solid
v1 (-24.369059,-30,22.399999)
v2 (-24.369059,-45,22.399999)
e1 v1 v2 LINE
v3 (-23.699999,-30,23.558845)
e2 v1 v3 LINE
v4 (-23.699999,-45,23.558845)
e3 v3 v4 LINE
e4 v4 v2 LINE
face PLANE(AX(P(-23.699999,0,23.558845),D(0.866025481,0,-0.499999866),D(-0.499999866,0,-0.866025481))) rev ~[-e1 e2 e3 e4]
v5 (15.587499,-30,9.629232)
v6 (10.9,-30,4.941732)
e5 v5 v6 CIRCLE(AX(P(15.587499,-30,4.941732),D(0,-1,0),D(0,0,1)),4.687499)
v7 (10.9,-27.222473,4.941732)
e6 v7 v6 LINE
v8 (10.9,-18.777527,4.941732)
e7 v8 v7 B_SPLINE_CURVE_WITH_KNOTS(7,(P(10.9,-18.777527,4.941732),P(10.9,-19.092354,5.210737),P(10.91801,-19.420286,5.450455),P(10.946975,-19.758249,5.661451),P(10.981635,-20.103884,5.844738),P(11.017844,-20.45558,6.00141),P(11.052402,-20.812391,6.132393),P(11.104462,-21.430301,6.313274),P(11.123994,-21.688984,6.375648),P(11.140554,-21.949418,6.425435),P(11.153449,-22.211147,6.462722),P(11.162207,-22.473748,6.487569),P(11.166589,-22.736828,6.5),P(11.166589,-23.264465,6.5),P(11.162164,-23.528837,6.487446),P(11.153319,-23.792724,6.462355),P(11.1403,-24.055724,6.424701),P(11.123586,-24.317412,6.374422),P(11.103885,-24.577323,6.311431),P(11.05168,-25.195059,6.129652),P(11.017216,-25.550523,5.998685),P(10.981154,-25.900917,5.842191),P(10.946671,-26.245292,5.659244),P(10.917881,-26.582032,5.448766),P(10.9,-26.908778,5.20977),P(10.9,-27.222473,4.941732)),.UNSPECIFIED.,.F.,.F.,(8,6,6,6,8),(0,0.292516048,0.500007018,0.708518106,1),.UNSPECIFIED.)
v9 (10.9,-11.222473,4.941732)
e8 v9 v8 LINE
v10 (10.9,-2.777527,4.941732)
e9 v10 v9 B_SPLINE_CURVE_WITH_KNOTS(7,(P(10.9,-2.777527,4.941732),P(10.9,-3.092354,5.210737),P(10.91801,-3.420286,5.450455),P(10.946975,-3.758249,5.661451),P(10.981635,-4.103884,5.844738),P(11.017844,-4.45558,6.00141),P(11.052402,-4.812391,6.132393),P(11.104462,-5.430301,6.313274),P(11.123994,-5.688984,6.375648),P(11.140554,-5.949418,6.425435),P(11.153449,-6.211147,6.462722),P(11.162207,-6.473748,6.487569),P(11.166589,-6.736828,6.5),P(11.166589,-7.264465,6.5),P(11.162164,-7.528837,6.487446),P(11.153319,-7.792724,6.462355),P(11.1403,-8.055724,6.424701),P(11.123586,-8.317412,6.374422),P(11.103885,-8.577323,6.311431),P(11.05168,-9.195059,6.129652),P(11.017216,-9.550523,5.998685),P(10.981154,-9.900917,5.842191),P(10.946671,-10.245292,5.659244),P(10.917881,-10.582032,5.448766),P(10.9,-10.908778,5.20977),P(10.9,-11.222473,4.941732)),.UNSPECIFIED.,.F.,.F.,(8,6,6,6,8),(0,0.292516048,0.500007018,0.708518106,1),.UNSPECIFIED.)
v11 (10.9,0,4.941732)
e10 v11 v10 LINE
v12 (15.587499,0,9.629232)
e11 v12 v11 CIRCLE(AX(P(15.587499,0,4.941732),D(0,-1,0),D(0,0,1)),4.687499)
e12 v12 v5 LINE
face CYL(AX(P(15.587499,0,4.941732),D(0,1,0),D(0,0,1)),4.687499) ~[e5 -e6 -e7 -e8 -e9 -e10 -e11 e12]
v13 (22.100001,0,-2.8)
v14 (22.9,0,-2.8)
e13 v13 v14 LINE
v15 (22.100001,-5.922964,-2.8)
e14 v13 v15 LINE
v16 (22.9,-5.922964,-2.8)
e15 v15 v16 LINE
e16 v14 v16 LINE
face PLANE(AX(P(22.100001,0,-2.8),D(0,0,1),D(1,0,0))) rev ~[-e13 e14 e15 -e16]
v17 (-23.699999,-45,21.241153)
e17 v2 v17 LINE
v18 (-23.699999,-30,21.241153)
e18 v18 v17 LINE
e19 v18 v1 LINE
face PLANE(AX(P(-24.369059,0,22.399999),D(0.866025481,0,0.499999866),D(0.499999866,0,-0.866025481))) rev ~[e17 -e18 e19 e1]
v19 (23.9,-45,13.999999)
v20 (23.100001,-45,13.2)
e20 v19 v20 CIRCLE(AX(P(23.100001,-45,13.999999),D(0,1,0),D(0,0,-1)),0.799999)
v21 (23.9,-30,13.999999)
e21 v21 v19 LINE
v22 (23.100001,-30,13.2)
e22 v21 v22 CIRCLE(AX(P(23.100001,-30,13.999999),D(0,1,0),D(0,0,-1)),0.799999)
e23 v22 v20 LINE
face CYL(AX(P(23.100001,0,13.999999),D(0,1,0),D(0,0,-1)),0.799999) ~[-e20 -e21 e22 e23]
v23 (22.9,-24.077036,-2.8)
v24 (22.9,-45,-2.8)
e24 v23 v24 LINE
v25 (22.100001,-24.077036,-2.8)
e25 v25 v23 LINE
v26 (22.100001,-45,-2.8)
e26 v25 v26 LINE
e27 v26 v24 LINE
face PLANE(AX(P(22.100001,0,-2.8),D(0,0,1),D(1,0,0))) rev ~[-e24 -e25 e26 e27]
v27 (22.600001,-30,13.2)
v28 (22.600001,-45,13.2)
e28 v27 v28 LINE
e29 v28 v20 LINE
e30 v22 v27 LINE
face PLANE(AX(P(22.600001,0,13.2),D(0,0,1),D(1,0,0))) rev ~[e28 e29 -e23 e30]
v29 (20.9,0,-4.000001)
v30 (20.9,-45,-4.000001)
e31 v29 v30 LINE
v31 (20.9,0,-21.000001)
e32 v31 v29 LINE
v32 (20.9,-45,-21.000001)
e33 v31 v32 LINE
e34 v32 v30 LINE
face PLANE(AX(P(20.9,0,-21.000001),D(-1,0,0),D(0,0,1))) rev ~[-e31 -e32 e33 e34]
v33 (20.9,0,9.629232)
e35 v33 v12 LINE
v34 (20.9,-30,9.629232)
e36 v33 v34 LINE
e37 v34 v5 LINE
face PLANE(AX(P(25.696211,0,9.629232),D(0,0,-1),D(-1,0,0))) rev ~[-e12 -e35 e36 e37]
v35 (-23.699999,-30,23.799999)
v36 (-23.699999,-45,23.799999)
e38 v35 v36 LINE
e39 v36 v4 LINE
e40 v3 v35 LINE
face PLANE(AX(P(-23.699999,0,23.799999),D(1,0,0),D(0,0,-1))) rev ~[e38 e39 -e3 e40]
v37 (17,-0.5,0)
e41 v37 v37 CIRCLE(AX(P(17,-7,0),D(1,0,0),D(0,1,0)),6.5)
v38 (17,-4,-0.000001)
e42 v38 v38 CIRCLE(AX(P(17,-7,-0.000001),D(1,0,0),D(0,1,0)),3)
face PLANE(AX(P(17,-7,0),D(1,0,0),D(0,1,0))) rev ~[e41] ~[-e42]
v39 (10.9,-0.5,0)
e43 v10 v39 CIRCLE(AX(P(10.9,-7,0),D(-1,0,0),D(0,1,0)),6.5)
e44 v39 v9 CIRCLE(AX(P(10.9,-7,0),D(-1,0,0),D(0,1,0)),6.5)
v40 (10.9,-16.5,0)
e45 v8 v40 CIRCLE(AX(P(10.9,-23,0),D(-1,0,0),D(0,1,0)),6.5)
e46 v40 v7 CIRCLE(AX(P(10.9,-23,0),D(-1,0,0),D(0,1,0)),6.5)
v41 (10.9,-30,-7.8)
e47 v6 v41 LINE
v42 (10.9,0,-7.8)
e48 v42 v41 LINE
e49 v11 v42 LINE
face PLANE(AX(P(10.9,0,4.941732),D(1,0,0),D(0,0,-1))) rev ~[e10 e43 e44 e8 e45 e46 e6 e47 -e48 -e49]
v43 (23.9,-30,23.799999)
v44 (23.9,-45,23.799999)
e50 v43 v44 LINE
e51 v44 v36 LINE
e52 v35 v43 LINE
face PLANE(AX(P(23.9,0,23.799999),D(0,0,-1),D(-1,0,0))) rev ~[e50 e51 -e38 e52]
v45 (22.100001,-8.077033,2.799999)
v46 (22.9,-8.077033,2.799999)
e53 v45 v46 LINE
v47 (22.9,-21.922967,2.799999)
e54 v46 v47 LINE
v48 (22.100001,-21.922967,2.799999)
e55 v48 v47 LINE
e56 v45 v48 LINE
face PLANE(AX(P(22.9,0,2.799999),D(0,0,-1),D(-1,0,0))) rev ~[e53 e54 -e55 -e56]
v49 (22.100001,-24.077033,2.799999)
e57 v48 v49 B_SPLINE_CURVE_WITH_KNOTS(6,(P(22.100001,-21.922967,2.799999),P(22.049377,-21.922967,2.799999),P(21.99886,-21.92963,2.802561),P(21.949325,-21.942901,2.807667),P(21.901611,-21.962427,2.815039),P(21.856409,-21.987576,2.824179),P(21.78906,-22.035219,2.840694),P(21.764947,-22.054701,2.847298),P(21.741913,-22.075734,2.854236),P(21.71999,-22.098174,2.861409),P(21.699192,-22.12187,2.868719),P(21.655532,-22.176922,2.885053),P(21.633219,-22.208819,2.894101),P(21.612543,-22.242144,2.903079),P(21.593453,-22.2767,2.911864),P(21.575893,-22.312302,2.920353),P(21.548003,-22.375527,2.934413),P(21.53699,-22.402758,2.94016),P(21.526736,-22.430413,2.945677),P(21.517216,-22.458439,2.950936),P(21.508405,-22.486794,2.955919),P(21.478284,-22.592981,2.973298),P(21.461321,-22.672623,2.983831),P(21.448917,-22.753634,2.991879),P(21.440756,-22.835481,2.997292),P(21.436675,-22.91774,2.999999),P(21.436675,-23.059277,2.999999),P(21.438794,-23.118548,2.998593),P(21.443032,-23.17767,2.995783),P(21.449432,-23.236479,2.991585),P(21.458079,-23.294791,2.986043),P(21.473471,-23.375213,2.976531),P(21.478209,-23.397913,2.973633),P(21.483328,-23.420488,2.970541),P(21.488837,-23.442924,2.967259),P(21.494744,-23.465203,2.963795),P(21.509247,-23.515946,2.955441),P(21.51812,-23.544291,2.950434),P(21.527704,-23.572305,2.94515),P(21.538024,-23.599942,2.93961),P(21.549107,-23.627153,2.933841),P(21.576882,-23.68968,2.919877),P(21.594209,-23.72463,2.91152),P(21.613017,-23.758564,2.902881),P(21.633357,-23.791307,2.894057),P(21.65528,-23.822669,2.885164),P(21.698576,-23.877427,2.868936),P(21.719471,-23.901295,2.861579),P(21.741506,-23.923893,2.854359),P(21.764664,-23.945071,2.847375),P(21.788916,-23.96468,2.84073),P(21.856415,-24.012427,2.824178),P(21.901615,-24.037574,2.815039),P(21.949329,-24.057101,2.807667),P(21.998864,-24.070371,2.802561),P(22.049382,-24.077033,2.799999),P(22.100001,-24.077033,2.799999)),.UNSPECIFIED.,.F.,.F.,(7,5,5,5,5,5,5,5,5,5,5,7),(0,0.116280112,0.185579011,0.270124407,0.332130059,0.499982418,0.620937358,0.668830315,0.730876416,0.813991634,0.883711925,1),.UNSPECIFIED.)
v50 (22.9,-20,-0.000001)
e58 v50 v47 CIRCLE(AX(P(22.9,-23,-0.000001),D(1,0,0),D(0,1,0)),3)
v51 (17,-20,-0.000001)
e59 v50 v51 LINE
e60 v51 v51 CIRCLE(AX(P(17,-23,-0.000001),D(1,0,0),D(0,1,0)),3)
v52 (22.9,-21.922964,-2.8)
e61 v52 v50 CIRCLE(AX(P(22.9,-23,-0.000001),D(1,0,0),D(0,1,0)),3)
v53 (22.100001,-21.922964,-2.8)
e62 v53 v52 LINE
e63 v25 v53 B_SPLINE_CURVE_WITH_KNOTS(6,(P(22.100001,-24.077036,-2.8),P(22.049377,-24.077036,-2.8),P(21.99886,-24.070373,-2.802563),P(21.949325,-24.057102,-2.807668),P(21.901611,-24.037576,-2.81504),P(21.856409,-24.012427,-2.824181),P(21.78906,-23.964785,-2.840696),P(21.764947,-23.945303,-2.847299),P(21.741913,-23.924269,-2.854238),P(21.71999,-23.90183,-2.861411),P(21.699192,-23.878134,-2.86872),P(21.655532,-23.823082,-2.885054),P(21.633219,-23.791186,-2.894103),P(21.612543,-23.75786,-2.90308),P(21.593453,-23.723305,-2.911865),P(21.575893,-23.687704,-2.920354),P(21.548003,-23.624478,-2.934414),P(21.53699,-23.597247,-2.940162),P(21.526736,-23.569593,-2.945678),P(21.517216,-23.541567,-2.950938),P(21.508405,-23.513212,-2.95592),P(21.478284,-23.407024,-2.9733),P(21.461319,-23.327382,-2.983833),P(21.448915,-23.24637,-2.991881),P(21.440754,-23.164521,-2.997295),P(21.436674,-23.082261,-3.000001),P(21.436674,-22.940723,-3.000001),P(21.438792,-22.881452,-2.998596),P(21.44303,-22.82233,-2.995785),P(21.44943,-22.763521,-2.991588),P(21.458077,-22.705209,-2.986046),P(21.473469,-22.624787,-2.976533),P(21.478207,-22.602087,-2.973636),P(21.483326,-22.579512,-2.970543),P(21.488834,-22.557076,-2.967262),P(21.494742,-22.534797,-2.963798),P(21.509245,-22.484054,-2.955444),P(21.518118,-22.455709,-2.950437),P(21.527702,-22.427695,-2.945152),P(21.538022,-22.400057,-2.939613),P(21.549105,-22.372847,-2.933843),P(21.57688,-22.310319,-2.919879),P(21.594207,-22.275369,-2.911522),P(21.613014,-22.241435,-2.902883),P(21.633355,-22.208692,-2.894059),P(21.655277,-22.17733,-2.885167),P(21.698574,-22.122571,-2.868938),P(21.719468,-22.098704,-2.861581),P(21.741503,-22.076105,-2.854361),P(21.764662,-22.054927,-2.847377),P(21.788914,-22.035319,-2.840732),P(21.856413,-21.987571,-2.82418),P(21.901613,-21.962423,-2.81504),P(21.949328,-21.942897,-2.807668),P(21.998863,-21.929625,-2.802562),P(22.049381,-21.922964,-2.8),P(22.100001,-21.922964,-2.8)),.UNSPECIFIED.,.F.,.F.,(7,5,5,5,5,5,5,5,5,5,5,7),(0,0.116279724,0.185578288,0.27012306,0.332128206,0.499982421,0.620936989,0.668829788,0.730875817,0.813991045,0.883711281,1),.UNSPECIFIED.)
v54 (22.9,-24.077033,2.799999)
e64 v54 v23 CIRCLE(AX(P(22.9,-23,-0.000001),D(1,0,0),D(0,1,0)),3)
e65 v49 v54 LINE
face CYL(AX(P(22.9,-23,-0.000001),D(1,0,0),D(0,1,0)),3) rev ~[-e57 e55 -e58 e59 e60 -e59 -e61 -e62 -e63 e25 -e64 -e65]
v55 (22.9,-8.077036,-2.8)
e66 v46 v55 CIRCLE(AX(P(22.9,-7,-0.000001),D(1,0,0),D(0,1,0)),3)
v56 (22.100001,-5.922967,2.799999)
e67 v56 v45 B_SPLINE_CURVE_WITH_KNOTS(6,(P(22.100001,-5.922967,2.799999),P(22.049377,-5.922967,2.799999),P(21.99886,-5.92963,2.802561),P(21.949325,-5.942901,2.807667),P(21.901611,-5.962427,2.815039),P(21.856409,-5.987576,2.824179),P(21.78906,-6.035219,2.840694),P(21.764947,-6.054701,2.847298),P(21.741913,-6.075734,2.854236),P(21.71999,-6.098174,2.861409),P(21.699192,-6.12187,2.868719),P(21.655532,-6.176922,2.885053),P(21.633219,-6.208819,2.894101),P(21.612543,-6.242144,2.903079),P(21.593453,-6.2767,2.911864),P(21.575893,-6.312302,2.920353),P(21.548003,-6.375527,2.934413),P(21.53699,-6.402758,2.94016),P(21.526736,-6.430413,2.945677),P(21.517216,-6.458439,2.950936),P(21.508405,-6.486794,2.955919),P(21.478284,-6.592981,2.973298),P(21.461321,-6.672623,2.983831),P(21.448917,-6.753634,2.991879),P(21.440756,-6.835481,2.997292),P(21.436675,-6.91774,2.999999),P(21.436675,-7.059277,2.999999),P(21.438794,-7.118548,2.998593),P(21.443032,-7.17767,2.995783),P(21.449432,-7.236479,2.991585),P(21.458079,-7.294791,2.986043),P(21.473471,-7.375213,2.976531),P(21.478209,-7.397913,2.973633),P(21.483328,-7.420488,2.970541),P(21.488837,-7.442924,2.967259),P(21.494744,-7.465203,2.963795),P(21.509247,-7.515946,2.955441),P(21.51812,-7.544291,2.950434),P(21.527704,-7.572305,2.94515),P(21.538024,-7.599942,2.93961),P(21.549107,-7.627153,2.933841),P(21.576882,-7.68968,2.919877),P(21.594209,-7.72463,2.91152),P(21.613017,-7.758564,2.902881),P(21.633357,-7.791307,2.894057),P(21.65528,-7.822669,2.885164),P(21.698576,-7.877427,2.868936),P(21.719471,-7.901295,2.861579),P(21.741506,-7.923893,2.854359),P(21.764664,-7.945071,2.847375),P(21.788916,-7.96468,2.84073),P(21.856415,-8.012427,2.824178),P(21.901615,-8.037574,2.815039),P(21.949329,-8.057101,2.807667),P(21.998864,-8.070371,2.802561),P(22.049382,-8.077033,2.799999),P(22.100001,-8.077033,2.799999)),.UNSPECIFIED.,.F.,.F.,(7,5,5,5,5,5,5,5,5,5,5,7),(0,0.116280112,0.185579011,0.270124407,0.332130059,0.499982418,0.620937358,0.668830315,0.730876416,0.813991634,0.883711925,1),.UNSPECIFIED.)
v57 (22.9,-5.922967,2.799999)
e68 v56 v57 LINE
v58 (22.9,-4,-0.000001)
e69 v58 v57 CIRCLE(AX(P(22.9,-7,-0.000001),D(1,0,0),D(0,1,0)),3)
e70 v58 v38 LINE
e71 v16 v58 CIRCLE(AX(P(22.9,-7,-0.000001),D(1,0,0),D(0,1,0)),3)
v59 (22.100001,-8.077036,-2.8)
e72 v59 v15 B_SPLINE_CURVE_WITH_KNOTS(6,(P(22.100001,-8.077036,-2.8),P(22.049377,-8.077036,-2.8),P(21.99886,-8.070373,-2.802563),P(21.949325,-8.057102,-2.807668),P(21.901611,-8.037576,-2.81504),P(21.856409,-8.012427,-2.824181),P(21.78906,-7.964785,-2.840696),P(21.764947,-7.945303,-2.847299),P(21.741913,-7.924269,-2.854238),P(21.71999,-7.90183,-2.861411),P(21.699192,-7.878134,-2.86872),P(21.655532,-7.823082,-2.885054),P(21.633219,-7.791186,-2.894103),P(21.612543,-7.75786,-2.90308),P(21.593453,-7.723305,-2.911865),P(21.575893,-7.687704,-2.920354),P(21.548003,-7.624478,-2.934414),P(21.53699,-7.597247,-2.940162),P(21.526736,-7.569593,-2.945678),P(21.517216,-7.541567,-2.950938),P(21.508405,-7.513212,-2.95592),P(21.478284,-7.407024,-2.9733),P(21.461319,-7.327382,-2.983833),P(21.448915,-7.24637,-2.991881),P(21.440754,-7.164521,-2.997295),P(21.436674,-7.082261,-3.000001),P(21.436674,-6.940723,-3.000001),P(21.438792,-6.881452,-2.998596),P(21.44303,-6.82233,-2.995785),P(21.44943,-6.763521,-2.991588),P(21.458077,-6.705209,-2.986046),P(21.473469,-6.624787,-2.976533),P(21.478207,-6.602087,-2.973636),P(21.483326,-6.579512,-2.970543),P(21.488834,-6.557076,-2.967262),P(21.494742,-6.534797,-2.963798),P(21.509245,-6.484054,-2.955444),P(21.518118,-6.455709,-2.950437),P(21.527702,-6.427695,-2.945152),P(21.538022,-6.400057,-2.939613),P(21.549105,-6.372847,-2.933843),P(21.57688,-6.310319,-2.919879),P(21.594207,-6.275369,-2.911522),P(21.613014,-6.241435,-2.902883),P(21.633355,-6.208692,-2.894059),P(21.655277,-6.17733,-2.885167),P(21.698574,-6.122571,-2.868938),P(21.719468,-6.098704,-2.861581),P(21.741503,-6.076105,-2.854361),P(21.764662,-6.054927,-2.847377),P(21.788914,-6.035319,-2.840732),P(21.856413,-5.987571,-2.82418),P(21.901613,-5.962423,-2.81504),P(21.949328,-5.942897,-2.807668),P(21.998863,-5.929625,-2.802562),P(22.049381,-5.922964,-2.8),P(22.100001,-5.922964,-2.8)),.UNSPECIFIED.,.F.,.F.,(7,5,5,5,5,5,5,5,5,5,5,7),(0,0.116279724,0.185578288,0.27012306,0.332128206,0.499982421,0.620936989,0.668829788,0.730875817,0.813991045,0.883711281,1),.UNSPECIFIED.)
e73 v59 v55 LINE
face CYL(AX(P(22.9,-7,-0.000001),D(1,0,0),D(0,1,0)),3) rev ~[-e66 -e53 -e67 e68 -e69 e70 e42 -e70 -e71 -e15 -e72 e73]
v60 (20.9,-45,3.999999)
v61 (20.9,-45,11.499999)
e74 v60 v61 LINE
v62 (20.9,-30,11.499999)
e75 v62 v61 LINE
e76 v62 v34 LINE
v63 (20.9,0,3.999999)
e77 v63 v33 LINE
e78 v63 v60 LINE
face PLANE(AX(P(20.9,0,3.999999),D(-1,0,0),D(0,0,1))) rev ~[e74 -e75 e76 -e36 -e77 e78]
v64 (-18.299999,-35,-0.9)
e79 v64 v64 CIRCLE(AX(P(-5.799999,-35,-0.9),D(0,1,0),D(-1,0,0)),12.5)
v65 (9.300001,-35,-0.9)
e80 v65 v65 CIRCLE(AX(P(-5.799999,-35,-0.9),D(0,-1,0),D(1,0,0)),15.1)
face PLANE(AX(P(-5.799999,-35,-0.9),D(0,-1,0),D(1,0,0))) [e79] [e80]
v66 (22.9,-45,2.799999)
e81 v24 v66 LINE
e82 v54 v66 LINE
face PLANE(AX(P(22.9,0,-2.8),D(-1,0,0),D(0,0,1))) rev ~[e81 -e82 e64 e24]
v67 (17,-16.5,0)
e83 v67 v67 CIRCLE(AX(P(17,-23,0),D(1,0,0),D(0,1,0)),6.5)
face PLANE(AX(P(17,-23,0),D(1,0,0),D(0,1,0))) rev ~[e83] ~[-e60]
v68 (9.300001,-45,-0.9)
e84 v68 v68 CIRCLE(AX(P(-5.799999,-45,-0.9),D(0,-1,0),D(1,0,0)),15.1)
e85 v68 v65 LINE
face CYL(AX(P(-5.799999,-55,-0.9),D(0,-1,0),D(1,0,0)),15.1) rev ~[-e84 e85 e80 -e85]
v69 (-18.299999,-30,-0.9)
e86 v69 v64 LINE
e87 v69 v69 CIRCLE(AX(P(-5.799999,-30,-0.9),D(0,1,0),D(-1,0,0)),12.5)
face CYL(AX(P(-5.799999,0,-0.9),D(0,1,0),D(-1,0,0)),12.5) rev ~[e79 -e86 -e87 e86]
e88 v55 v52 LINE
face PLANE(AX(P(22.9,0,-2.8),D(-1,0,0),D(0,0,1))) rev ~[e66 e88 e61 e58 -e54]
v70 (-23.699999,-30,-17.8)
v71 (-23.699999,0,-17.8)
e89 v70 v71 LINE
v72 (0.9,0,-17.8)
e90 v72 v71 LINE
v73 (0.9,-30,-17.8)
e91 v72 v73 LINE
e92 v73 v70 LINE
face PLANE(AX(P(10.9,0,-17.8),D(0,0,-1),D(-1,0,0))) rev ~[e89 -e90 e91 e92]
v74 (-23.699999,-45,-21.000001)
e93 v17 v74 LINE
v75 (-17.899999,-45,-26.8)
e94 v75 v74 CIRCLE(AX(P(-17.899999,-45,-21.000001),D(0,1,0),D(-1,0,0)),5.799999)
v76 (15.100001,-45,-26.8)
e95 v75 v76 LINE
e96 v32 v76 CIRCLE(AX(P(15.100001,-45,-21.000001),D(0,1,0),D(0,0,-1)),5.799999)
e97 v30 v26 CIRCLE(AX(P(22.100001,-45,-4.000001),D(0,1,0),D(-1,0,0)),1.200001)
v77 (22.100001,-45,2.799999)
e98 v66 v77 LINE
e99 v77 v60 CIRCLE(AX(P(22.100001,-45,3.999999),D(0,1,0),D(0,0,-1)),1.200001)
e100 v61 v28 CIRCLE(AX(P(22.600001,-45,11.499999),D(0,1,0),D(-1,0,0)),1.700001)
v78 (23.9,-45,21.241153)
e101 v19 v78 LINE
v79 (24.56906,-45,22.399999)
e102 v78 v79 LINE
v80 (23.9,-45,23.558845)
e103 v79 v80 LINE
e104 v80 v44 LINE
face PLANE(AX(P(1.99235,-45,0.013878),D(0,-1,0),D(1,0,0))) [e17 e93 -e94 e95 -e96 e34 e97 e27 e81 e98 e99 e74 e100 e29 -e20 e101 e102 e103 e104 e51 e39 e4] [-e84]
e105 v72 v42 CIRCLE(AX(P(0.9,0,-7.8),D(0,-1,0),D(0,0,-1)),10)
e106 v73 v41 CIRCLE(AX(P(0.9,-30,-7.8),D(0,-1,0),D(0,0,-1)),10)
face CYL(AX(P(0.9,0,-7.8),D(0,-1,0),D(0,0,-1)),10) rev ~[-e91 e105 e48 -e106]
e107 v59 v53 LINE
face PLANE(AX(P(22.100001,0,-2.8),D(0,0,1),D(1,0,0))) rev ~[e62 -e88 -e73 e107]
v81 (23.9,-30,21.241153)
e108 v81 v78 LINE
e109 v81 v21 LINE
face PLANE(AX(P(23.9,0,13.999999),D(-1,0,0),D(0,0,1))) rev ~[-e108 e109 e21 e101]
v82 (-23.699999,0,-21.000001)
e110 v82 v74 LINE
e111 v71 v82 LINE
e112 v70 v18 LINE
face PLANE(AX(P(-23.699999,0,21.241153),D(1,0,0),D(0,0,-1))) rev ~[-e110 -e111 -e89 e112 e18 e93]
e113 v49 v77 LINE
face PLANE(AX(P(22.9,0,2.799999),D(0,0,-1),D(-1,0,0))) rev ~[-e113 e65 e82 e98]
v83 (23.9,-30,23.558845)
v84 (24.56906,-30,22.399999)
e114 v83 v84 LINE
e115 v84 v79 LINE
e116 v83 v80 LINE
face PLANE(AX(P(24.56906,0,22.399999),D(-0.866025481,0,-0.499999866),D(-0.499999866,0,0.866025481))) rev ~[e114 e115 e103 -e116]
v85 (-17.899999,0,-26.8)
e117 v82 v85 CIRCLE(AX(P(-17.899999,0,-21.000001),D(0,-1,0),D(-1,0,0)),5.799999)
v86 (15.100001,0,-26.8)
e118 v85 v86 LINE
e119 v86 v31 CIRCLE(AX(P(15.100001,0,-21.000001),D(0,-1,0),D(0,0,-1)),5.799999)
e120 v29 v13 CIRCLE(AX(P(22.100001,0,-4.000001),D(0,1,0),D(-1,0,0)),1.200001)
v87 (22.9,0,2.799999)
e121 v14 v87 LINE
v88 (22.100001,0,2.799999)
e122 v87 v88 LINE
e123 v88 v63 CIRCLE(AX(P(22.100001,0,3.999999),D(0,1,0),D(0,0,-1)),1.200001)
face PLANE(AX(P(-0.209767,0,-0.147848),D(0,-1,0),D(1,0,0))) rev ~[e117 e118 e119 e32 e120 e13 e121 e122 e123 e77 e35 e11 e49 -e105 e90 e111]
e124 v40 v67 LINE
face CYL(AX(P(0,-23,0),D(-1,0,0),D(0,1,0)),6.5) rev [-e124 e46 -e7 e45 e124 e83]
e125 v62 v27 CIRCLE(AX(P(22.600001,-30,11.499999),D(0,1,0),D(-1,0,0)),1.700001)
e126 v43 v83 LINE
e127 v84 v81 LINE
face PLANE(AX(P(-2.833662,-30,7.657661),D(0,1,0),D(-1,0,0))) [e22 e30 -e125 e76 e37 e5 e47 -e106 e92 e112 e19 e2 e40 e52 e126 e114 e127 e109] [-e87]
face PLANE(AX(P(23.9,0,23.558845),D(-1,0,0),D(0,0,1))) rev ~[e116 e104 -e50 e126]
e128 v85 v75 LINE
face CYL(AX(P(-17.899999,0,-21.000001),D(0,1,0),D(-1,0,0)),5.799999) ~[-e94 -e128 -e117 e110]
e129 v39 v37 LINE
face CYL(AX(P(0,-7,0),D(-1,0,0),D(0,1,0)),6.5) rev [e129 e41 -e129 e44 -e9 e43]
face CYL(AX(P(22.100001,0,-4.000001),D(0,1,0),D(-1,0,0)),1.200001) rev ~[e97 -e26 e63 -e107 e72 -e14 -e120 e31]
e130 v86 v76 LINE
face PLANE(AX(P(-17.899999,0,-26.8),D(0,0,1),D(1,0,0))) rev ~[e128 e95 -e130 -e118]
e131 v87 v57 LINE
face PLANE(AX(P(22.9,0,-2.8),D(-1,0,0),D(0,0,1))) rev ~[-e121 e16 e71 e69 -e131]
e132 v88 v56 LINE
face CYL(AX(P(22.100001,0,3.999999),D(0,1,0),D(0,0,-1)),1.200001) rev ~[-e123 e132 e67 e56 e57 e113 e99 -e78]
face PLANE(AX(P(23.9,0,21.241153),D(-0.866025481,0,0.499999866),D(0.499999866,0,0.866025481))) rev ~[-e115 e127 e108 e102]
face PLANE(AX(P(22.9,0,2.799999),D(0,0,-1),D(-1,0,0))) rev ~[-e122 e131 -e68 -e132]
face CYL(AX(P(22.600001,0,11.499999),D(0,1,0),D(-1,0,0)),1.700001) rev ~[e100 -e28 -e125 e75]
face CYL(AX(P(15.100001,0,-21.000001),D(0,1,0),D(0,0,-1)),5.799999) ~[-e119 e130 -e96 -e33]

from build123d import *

# Parameters (mm, degrees)
F1_DEPTH  = 55
F3_DEPTH  = 30
F4_R      = 3
F5_DEPTH  = 25
F6_R      = 12.5
F7_DEPTH  = 55.0010001
F8_R      = 15.1
F9_DEPTH  = 20
F10_R     = 6.5
F11_DEPTH = 17
F12_R     = 10
F13_W     = 62.573639676
F13_H     = 57.5273763388
F14_DEPTH = 10


# Not quite as in the source:
# - a feature names something its author has since deleted; it is built from what else it names


with BuildPart() as f1:
    # F0 (on Front) → F1 (new body)
    with BuildSketch(Plane.XZ):
        with BuildLine():
            Line((-23.6999987811, 23.7999986857), (-23.6999987811, 23.5588453133))
            Line((-23.6999987811, 23.5588453133), (-24.3690585991, 22.3999992996))
            Line((-24.3690585991, 22.3999992996), (-23.6999987811, 21.241153286))
            Line((-23.6999987811, 21.241153286), (-23.6999987811, -21.0000007004))
            ThreePointArc((-23.6999987811, -21.0000007004), (-22.0012182918, -25.1012195971), (-17.899999395, -26.8000000864))
            Line((-17.899999395, -26.8000000864), (15.100000605, -26.8000000864))
            ThreePointArc((15.100000605, -26.8000000864), (19.2012195018, -25.1012195971), (20.8999999911, -21.0000007004))
            Line((20.8999999911, -21.0000007004), (20.8999999911, -4.0000007004))
            ThreePointArc((20.8999999911, -4.0000007004), (21.2514720335, -3.1514721288), (22.100000605, -2.8000000864))
            Line((22.100000605, -2.8000000864), (22.8999999911, -2.8000000864))
            Line((22.8999999911, -2.8000000864), (22.8999999911, 2.7999986857))
            Line((22.8999999911, 2.7999986857), (22.100000605, 2.7999986857))
            ThreePointArc((22.100000605, 2.7999986857), (21.2514720335, 3.1514707281), (20.8999999911, 3.9999992996))
            Line((20.8999999911, 3.9999992996), (20.8999999911, 11.4999992996))
            ThreePointArc((20.8999999911, 11.4999992996), (21.3979186429, 12.7020812618), (22.600000605, 13.1999999136))
            Line((22.600000605, 13.1999999136), (23.100000605, 13.1999999136))
            ThreePointArc((23.100000605, 13.1999999136), (23.6656855958, 13.4343143088), (23.8999999911, 13.9999992996))
            Line((23.8999999911, 13.9999992996), (23.8999999911, 21.241153286))
            Line((23.8999999911, 21.241153286), (24.5690598091, 22.3999992996))
            Line((24.5690598091, 22.3999992996), (23.8999999911, 23.5588453133))
            Line((23.8999999911, 23.5588453133), (23.8999999911, 23.7999986857))
            Line((23.8999999911, 23.7999986857), (-23.6999987811, 23.7999986857))
        make_face()
    extrude(amount=F1_DEPTH)

    # F2 (on face) → F3 (cut)
    with BuildSketch(Plane(origin=(0, 0, 0), x_dir=(-1, 0, 0), z_dir=(0, 1, 0))):
        with BuildLine():
            Line((-9.7267732358, -17.8000000864), (27.0197465134, -17.8000000864))
            Line((27.0197465134, -17.8000000864), (27.0197465134, 29.101931586))
            Line((27.0197465134, 29.101931586), (-25.6962114531, 29.101931586))
            Line((-25.6962114531, 29.101931586), (-25.6962114531, 9.6292318066))
            Line((-25.6962114531, 9.6292318066), (-15.5874993246, 9.6292318066))
            ThreePointArc((-15.5874993246, 9.6292318066), (-12.272936759, 8.2562950386), (-10.8999999911, 4.9417324731))
            Line((-10.8999999911, 4.9417324731), (-10.8999999911, -12.1750008862))
            Line((-10.8999999911, -12.1750008862), (-10.8999999911, -17.8000000864))
            Line((-10.8999999911, -17.8000000864), (-9.7267732358, -17.8000000864))
        make_face()
    extrude(amount=-F3_DEPTH, mode=Mode.SUBTRACT)

    # F4 (on face) → F5 (cut)
    with BuildSketch(Plane.YZ.offset(22.8999999911)):
        with Locations((-7, -1.3143e-06)):
            Circle(F4_R)
        with Locations((-23, -1.3143e-06)):
            Circle(F4_R)
    extrude(amount=-F5_DEPTH, mode=Mode.SUBTRACT)

    # F6 (on face) → F7 (cut, through all)
    with BuildSketch(Plane(origin=(0, 0, 0), x_dir=(-1, 0, 0), z_dir=(0, 1, 0))):
        with Locations((5.7999987811, -0.9000000864)):
            Circle(F6_R)
    extrude(amount=-F7_DEPTH, mode=Mode.SUBTRACT)

    # F8 (on face) → F9 (cut)
    with BuildSketch(Plane.XZ.offset(55)):
        with Locations((-5.7999987811, -0.9000000864)):
            Circle(F8_R)
    extrude(amount=-F9_DEPTH, mode=Mode.SUBTRACT)

    # F10 (on Right) → F11 (cut)
    with BuildSketch(Plane.YZ):
        with Locations((-23, 0)):
            Circle(F10_R)
        with Locations((-7, 0)):
            Circle(F10_R)
    extrude(amount=F11_DEPTH, mode=Mode.SUBTRACT)

    # F12
    f12_edges = [f1.edges().sort_by_distance(p)[0] for p in [
        (10.9, -15, -17.8),
    ]]
    fillet(f12_edges, radius=F12_R)

    # F13 (on face) → F14 (cut)
    with BuildSketch(Plane.XZ.offset(55)):
        with Locations((1.9923495129, 0.0138776377)):
            Rectangle(F13_W, F13_H)
    extrude(amount=-F14_DEPTH, mode=Mode.SUBTRACT)


solid = f1.part
